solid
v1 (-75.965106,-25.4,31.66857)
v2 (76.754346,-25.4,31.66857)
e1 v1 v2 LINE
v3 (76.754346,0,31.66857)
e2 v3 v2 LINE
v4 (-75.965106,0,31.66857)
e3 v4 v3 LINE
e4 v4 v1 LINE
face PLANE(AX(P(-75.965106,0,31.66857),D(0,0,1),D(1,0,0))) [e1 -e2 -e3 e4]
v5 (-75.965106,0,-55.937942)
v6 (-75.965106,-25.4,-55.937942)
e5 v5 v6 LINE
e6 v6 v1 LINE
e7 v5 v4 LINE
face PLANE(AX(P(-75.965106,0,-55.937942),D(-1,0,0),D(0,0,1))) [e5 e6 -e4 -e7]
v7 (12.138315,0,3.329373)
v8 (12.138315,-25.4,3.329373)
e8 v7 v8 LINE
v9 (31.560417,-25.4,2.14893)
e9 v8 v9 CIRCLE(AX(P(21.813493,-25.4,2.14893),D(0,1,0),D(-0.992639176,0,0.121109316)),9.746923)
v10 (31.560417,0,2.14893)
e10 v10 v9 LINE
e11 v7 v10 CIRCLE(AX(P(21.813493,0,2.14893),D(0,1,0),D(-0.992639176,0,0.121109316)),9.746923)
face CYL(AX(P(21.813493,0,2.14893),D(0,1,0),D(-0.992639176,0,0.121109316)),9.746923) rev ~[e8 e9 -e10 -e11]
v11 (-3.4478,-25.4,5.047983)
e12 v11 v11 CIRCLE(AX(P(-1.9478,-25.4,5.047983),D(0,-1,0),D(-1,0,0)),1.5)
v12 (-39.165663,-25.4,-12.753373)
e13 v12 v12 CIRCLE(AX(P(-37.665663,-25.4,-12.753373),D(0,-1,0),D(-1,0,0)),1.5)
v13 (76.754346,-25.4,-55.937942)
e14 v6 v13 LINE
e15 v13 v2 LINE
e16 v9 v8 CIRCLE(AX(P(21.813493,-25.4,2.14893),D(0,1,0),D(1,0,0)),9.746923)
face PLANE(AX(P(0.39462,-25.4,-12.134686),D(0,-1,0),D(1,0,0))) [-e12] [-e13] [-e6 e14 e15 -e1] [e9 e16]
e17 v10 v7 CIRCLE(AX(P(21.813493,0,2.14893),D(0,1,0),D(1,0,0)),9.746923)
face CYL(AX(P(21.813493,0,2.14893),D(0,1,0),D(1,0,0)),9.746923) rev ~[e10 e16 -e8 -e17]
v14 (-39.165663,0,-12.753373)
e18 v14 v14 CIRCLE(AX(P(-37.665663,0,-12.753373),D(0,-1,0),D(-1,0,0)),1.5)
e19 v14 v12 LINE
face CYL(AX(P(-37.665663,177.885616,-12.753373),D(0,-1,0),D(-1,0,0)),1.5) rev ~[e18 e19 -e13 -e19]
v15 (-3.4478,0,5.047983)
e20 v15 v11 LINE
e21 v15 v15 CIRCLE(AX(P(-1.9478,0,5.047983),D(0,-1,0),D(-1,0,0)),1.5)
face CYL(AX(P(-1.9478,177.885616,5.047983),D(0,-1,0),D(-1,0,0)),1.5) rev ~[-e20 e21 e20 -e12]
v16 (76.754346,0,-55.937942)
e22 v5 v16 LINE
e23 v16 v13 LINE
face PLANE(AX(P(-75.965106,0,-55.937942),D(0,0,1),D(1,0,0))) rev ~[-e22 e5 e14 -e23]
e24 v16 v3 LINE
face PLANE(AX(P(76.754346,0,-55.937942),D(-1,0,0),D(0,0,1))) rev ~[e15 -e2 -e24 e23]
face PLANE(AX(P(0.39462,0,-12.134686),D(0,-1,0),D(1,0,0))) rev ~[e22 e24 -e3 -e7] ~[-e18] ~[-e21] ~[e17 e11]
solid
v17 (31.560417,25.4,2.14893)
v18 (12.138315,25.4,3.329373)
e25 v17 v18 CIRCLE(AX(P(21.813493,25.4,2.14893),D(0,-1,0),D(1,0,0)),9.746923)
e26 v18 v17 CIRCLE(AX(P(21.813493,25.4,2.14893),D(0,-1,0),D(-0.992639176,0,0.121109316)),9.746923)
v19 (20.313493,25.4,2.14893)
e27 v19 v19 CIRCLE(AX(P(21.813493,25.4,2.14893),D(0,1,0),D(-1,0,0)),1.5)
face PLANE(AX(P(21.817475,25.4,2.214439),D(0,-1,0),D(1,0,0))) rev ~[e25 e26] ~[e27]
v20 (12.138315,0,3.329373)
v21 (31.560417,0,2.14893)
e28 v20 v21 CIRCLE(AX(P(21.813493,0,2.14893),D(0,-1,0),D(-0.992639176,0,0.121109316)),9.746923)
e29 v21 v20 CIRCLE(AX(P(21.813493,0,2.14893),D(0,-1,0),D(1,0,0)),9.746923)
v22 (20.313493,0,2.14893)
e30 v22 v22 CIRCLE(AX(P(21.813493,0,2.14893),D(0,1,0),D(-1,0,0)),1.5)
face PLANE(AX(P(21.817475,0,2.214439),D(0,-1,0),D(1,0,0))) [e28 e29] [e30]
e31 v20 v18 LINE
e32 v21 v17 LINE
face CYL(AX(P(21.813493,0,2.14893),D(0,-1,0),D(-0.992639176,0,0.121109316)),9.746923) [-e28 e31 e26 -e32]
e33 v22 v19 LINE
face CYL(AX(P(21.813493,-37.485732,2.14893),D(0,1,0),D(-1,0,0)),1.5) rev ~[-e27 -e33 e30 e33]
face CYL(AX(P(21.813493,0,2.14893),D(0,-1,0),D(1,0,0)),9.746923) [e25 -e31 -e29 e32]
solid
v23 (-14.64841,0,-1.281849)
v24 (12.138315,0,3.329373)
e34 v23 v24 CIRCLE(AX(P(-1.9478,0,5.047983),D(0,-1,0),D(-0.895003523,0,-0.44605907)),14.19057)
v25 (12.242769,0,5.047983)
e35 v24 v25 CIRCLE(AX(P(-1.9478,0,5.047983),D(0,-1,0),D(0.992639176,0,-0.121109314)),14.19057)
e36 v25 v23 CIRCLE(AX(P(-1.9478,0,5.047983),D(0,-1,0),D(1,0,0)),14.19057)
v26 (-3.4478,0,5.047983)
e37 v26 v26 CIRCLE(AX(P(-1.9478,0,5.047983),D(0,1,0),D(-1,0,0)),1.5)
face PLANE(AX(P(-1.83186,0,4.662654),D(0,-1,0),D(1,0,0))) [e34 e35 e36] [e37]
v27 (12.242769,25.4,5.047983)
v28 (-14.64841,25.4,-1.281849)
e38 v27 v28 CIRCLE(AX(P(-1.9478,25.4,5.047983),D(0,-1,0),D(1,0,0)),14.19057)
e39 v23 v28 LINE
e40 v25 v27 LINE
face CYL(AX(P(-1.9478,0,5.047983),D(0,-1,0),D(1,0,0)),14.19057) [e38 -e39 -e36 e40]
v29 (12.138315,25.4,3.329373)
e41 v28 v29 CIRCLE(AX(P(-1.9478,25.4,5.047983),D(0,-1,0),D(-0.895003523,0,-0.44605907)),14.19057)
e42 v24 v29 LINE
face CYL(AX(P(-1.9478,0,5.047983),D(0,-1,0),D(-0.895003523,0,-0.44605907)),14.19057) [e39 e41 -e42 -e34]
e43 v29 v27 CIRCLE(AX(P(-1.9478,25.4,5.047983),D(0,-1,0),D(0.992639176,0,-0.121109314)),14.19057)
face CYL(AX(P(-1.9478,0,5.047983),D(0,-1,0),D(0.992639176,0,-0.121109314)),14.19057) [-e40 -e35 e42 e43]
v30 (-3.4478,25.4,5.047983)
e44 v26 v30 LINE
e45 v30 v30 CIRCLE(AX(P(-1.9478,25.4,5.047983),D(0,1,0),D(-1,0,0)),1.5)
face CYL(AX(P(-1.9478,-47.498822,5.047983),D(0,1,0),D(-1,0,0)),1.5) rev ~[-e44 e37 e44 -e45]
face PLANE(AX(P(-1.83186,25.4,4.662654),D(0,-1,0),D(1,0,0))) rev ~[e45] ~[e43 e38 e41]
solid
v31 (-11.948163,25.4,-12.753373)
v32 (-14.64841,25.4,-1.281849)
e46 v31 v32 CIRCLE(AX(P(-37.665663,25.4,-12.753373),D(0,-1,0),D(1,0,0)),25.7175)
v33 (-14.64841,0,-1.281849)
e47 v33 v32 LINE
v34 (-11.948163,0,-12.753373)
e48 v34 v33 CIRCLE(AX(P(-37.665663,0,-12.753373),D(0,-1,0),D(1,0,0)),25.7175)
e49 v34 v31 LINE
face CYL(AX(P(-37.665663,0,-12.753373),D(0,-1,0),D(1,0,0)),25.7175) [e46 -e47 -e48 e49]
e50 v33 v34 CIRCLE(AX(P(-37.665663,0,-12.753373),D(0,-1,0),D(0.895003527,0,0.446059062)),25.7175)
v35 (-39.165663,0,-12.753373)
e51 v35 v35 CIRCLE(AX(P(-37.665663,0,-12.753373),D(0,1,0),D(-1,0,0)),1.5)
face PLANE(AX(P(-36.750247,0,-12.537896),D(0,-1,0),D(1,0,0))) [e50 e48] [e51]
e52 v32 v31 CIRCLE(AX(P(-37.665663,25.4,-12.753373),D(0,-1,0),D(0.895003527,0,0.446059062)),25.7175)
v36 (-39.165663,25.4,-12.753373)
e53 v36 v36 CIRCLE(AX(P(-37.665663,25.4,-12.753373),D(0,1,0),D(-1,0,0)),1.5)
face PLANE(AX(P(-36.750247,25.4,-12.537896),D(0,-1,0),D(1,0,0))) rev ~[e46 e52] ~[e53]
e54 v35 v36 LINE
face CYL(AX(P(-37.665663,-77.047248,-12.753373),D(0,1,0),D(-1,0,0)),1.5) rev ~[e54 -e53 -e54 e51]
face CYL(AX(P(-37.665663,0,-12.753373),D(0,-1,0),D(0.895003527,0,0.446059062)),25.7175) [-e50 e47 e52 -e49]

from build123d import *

# Parameters (mm, degrees)
F0_W     = 152.7194529772
F0_H     = 87.6065120101
F1_DEPTH = 25.4
F2_DEPTH = 25.4
F4_DEPTH = 25.4
F5_DEPTH = 25.4
F8_D     = 3
F9_D     = 3
F10_D    = 3
F11_D    = 3
F12_D    = 3


# Not quite as in the source:
# - a feature of the source that left no trace in its solid (it failed there, or was rolled back) is left out


with BuildPart() as f1:
    # F0 (on Front) → F1 (new body)
    with BuildSketch(Plane.XZ):
        with Locations((0.3946200013, -12.1346861124)):
            Rectangle(F0_W, F0_H)
        with BuildLine():
            ThreePointArc((-14.6484100073, -1.2818487871), (-12.6323252843, -6.8608521587), (-11.9481632112, -12.7533727135))
            ThreePointArc((-11.9481632112, -12.7533727135), (-62.6990011381, -18.6458932683), (-14.6484100073, -1.2818487871))
        make_face(mode=Mode.SUBTRACT)
        with BuildLine():
            ThreePointArc((12.1383150794, 3.3293733395), (0.4596359109, -8.9368839284), (-14.6484100073, -1.2818487871))
            ThreePointArc((-14.6484100073, -1.2818487871), (-5.1992136459, 18.8610416578), (12.2427693617, 5.0479834842))
            ThreePointArc((12.2427693617, 5.0479834842), (12.2166317196, 4.1870927352), (12.1383150794, 3.3293733395))
        make_face(mode=Mode.SUBTRACT)
        with BuildLine():
            ThreePointArc((31.5604166727, 2.1489301), (21.2221824249, -7.5800405103), (12.1383150794, 3.3293733395))
            ThreePointArc((12.1383150794, 3.3293733395), (22.4048039377, 11.8779007103), (31.5604166727, 2.1489301))
        make_face(mode=Mode.SUBTRACT)
        with BuildLine():
            ThreePointArc((-14.6484100073, -1.2818487871), (-62.6990011381, -18.6458932683), (-11.9481632112, -12.7533727135))
            ThreePointArc((-11.9481632112, -12.7533727135), (-12.6323252843, -6.8608521587), (-14.6484100073, -1.2818487871))
        make_face()
        with BuildLine():
            ThreePointArc((12.2427693617, 5.0479834842), (-5.1992136459, 18.8610416578), (-14.6484100073, -1.2818487871))
            ThreePointArc((-14.6484100073, -1.2818487871), (0.4596359109, -8.9368839284), (12.1383150794, 3.3293733395))
            ThreePointArc((12.1383150794, 3.3293733395), (12.2166317196, 4.1870927352), (12.2427693617, 5.0479834842))
        make_face()
    extrude(amount=F1_DEPTH)

    # F11 (through all)
    with Locations(Plane(origin=(0, 0, 0), x_dir=(1, 0, 0), z_dir=(0, 1, 0))):
        with Locations((-1.9478002292, -5.0479834842)):
            Hole(F11_D / 2)

    # F12 (through all)
    with Locations(Plane(origin=(0, 0, 0), x_dir=(1, 0, 0), z_dir=(0, 1, 0))):
        with Locations((-37.6656632112, 12.7533727135)):
            Hole(F12_D / 2)


with BuildPart() as f2:
    # F0 (on Front) → F2 (new body)
    with BuildSketch(Plane.XZ):
        with BuildLine():
            ThreePointArc((-14.6484100073, -1.2818487871), (-62.6990011381, -18.6458932683), (-11.9481632112, -12.7533727135))
            ThreePointArc((-11.9481632112, -12.7533727135), (-12.6323252843, -6.8608521587), (-14.6484100073, -1.2818487871))
        make_face()
    extrude(amount=-F2_DEPTH)

    # F10 (through all)
    with Locations(Plane.XZ):
        with Locations((-37.6656632112, -12.7533727135)):
            Hole(F10_D / 2)


with BuildPart() as f2b:
    # F0 (on Front) → F2, piece 2 (new body)
    with BuildSketch(Plane.XZ):
        with BuildLine():
            ThreePointArc((31.5604166727, 2.1489301), (22.4048039377, 11.8779007103), (12.1383150794, 3.3293733395))
            ThreePointArc((12.1383150794, 3.3293733395), (21.2221824249, -7.5800405103), (31.5604166727, 2.1489301))
        make_face()
    extrude(amount=-F2_DEPTH)

    # F8 (through all)
    with Locations(Plane.XZ):
        with Locations((21.8134931813, 2.1489301)):
            Hole(F8_D / 2)


with BuildPart() as f4:
    # F0 (on Front) → F4 (new body)
    with BuildSketch(Plane.XZ):
        with BuildLine():
            ThreePointArc((31.5604166727, 2.1489301), (22.4048039377, 11.8779007103), (12.1383150794, 3.3293733395))
            ThreePointArc((12.1383150794, 3.3293733395), (21.2221824249, -7.5800405103), (31.5604166727, 2.1489301))
        make_face()
    extrude(amount=F4_DEPTH)


with BuildPart() as f5:
    # F0 (on Front) → F5 (new body)
    with BuildSketch(Plane.XZ):
        with BuildLine():
            ThreePointArc((12.2427693617, 5.0479834842), (-5.1992136459, 18.8610416578), (-14.6484100073, -1.2818487871))
            ThreePointArc((-14.6484100073, -1.2818487871), (0.4596359109, -8.9368839284), (12.1383150794, 3.3293733395))
            ThreePointArc((12.1383150794, 3.3293733395), (12.2166317196, 4.1870927352), (12.2427693617, 5.0479834842))
        make_face()
    extrude(amount=-F5_DEPTH)

    # F9 (through all)
    with Locations(Plane.XZ):
        with Locations((-1.9478002292, 5.0479834842)):
            Hole(F9_D / 2)


solid = Compound([f1.part, f2.part, f2b.part, f5.part])
